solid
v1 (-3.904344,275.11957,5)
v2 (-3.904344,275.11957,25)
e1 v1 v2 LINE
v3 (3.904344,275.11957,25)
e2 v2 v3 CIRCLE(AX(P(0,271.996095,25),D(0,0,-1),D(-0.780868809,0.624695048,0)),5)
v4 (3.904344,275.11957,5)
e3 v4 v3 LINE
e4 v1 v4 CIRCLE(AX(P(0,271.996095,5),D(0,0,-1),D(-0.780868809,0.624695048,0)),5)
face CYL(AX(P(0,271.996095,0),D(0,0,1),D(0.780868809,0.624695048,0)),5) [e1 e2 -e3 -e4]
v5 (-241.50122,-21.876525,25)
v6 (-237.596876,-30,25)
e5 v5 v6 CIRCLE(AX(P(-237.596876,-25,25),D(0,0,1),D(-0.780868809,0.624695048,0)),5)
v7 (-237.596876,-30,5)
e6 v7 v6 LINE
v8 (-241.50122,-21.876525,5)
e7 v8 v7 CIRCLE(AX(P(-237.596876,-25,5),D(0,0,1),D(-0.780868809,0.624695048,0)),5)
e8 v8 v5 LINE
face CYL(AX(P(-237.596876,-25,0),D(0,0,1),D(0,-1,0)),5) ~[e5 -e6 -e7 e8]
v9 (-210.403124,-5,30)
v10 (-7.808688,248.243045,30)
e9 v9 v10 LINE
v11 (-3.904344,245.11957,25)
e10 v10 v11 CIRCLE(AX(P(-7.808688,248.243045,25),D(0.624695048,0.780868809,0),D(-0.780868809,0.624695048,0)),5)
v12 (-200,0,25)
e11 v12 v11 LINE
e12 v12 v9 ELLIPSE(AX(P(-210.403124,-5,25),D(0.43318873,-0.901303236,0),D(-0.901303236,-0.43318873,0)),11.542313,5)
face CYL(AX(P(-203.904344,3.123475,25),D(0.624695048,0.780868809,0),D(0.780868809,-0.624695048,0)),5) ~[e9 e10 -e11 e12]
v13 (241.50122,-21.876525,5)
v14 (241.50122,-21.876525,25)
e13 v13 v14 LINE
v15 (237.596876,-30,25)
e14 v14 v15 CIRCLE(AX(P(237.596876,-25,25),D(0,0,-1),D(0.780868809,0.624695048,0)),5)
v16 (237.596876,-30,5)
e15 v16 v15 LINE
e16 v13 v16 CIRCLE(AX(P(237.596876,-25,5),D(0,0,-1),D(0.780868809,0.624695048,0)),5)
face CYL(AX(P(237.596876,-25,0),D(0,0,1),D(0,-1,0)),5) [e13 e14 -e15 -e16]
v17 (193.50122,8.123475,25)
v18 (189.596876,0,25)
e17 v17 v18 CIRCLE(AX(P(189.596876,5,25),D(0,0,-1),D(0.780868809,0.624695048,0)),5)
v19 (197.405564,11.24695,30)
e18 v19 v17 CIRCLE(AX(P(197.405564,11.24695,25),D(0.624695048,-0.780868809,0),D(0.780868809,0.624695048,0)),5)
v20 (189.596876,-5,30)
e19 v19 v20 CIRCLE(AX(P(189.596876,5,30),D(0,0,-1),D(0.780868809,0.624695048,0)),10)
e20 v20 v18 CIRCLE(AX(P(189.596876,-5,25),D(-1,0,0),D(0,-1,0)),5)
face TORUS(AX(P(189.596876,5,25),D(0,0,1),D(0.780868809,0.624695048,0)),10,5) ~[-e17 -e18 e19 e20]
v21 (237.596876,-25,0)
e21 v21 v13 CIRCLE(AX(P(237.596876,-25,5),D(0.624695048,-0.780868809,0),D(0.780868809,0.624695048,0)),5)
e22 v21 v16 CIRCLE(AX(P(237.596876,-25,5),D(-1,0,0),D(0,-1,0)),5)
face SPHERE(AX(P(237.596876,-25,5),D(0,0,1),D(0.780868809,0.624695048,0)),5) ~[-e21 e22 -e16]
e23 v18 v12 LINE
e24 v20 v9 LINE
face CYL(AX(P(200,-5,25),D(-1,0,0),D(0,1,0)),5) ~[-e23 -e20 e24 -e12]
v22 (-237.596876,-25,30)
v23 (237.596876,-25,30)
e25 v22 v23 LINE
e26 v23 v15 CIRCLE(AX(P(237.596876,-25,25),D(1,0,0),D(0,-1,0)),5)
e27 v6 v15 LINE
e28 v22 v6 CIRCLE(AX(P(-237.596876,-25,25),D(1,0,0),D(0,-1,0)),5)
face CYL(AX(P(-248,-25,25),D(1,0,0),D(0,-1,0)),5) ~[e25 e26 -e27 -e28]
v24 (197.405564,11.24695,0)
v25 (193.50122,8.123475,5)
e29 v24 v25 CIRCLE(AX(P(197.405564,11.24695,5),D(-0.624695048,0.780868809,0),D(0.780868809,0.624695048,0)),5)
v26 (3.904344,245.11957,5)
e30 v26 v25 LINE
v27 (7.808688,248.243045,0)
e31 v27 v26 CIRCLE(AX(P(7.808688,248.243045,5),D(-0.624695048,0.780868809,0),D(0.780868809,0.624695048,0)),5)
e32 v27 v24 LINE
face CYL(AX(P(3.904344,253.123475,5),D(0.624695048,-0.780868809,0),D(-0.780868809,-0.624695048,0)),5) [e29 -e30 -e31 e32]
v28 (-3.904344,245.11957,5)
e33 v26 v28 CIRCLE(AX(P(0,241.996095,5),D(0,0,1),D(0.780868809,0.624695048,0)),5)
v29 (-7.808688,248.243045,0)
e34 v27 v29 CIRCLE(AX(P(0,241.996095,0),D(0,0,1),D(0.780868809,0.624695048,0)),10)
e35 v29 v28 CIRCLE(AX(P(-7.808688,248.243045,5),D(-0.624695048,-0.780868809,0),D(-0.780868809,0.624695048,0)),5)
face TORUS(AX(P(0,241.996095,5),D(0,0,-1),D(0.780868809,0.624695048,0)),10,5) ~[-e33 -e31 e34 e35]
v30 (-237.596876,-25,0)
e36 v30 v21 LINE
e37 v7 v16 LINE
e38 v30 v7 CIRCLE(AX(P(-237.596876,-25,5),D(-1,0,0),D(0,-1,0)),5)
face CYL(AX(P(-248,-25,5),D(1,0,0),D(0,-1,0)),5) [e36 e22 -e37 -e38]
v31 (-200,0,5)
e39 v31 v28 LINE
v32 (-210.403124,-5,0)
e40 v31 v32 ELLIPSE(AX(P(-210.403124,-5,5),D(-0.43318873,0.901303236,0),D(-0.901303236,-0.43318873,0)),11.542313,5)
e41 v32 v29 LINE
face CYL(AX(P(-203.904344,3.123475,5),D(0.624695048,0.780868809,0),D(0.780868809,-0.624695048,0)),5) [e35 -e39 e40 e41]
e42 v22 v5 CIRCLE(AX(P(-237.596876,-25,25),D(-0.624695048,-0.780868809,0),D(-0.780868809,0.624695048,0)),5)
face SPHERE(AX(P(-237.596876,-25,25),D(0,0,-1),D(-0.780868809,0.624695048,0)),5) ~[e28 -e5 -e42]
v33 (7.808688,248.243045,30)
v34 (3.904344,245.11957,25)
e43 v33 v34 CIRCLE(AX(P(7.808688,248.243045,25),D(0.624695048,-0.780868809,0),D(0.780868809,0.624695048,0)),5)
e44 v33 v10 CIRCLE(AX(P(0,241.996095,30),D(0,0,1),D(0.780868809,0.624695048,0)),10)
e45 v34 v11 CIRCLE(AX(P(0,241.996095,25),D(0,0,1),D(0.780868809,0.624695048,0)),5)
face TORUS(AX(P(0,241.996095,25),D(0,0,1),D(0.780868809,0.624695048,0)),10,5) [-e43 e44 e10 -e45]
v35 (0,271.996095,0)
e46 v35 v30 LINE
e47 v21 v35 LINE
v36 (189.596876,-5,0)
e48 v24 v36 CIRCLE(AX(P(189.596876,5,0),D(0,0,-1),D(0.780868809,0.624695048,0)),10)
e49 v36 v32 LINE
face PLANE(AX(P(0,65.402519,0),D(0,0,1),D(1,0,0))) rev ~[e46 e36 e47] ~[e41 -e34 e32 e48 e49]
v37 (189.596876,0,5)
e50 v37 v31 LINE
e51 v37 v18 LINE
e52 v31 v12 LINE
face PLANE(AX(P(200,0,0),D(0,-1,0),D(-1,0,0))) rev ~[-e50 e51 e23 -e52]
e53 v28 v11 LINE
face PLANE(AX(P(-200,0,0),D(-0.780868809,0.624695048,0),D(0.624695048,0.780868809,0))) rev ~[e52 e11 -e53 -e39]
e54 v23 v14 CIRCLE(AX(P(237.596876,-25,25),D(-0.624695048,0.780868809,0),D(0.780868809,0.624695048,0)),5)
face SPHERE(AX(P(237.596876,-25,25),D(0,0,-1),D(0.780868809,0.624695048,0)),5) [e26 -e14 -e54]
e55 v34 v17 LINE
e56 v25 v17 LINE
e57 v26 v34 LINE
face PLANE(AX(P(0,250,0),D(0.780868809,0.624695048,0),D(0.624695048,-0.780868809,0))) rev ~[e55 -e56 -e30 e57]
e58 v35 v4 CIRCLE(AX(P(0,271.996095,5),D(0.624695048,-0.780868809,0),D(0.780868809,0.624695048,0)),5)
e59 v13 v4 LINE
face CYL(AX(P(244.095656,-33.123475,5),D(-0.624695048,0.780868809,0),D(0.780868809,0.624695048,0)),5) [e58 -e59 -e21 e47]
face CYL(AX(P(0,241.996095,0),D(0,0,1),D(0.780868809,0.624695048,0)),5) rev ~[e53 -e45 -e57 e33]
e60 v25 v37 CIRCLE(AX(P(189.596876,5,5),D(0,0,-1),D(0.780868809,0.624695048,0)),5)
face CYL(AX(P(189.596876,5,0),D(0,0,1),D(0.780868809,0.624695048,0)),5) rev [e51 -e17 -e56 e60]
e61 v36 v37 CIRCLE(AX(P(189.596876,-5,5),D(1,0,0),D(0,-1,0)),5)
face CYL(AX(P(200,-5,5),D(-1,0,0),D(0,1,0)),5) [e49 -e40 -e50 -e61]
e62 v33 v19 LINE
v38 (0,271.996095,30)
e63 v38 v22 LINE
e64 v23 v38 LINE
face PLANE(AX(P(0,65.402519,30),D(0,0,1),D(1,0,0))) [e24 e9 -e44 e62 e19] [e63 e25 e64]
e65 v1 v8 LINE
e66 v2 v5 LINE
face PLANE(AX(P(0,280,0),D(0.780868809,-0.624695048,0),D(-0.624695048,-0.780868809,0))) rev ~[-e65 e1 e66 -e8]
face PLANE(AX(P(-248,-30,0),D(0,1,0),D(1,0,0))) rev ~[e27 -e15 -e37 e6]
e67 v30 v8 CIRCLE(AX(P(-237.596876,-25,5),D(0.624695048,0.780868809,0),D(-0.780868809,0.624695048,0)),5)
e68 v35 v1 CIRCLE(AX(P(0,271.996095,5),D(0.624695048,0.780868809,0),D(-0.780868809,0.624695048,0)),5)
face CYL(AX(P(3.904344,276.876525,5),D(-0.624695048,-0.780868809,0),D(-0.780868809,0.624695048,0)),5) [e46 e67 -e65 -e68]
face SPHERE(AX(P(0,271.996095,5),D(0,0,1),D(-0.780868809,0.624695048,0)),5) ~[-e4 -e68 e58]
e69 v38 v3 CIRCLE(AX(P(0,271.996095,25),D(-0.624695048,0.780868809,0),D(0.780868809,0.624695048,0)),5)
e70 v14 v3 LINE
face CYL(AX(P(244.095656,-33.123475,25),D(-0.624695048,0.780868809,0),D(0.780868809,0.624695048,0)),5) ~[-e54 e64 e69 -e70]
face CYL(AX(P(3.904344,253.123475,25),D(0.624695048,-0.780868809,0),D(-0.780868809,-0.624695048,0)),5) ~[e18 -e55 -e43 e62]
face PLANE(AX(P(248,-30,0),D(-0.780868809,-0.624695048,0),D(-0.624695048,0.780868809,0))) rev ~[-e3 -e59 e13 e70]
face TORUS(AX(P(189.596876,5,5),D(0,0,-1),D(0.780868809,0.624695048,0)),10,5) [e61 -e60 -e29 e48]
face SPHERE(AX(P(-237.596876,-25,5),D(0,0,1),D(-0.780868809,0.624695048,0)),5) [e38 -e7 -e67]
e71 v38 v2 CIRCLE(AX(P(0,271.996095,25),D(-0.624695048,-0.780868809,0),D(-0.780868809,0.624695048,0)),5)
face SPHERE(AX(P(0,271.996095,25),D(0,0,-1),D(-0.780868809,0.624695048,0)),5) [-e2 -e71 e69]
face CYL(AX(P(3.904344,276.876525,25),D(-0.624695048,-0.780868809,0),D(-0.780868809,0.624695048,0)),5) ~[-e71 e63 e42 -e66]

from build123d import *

# Parameters (mm, degrees)
F1_DEPTH = 30
F2_R     = 5


with BuildPart() as f1:
    # F0 (on Top) → F1 (new body)
    with BuildSketch(Plane.XY):
        Polygon((-248, -30), (0, -30), (248, -30), (0, 280), align=None)
        Polygon((200, 0), (0, 0), (-200, 0), (0, 250), align=None, mode=Mode.SUBTRACT)
    extrude(amount=F1_DEPTH)

    # F2
    f2_edges = [f1.edges().sort_by_distance(p)[0] for p in [
        (0, 280, 15),
        (-248, -30, 15),
        (-124, 125, 0),
        (-124, 125, 30),
        (248, -30, 15),
        (124, 125, 0),
        (124, 125, 30),
        (0, -30, 30),
        (0, -30, 0),
        (0, 0, 30),
        (-100, 125, 30),
        (0, 250, 15),
        (200, 0, 15),
        (100, 125, 0),
        (100, 125, 30),
        (0, 0, 0),
        (-100, 125, 0),
    ]]
    fillet(f2_edges, radius=F2_R)


solid = f1.part
